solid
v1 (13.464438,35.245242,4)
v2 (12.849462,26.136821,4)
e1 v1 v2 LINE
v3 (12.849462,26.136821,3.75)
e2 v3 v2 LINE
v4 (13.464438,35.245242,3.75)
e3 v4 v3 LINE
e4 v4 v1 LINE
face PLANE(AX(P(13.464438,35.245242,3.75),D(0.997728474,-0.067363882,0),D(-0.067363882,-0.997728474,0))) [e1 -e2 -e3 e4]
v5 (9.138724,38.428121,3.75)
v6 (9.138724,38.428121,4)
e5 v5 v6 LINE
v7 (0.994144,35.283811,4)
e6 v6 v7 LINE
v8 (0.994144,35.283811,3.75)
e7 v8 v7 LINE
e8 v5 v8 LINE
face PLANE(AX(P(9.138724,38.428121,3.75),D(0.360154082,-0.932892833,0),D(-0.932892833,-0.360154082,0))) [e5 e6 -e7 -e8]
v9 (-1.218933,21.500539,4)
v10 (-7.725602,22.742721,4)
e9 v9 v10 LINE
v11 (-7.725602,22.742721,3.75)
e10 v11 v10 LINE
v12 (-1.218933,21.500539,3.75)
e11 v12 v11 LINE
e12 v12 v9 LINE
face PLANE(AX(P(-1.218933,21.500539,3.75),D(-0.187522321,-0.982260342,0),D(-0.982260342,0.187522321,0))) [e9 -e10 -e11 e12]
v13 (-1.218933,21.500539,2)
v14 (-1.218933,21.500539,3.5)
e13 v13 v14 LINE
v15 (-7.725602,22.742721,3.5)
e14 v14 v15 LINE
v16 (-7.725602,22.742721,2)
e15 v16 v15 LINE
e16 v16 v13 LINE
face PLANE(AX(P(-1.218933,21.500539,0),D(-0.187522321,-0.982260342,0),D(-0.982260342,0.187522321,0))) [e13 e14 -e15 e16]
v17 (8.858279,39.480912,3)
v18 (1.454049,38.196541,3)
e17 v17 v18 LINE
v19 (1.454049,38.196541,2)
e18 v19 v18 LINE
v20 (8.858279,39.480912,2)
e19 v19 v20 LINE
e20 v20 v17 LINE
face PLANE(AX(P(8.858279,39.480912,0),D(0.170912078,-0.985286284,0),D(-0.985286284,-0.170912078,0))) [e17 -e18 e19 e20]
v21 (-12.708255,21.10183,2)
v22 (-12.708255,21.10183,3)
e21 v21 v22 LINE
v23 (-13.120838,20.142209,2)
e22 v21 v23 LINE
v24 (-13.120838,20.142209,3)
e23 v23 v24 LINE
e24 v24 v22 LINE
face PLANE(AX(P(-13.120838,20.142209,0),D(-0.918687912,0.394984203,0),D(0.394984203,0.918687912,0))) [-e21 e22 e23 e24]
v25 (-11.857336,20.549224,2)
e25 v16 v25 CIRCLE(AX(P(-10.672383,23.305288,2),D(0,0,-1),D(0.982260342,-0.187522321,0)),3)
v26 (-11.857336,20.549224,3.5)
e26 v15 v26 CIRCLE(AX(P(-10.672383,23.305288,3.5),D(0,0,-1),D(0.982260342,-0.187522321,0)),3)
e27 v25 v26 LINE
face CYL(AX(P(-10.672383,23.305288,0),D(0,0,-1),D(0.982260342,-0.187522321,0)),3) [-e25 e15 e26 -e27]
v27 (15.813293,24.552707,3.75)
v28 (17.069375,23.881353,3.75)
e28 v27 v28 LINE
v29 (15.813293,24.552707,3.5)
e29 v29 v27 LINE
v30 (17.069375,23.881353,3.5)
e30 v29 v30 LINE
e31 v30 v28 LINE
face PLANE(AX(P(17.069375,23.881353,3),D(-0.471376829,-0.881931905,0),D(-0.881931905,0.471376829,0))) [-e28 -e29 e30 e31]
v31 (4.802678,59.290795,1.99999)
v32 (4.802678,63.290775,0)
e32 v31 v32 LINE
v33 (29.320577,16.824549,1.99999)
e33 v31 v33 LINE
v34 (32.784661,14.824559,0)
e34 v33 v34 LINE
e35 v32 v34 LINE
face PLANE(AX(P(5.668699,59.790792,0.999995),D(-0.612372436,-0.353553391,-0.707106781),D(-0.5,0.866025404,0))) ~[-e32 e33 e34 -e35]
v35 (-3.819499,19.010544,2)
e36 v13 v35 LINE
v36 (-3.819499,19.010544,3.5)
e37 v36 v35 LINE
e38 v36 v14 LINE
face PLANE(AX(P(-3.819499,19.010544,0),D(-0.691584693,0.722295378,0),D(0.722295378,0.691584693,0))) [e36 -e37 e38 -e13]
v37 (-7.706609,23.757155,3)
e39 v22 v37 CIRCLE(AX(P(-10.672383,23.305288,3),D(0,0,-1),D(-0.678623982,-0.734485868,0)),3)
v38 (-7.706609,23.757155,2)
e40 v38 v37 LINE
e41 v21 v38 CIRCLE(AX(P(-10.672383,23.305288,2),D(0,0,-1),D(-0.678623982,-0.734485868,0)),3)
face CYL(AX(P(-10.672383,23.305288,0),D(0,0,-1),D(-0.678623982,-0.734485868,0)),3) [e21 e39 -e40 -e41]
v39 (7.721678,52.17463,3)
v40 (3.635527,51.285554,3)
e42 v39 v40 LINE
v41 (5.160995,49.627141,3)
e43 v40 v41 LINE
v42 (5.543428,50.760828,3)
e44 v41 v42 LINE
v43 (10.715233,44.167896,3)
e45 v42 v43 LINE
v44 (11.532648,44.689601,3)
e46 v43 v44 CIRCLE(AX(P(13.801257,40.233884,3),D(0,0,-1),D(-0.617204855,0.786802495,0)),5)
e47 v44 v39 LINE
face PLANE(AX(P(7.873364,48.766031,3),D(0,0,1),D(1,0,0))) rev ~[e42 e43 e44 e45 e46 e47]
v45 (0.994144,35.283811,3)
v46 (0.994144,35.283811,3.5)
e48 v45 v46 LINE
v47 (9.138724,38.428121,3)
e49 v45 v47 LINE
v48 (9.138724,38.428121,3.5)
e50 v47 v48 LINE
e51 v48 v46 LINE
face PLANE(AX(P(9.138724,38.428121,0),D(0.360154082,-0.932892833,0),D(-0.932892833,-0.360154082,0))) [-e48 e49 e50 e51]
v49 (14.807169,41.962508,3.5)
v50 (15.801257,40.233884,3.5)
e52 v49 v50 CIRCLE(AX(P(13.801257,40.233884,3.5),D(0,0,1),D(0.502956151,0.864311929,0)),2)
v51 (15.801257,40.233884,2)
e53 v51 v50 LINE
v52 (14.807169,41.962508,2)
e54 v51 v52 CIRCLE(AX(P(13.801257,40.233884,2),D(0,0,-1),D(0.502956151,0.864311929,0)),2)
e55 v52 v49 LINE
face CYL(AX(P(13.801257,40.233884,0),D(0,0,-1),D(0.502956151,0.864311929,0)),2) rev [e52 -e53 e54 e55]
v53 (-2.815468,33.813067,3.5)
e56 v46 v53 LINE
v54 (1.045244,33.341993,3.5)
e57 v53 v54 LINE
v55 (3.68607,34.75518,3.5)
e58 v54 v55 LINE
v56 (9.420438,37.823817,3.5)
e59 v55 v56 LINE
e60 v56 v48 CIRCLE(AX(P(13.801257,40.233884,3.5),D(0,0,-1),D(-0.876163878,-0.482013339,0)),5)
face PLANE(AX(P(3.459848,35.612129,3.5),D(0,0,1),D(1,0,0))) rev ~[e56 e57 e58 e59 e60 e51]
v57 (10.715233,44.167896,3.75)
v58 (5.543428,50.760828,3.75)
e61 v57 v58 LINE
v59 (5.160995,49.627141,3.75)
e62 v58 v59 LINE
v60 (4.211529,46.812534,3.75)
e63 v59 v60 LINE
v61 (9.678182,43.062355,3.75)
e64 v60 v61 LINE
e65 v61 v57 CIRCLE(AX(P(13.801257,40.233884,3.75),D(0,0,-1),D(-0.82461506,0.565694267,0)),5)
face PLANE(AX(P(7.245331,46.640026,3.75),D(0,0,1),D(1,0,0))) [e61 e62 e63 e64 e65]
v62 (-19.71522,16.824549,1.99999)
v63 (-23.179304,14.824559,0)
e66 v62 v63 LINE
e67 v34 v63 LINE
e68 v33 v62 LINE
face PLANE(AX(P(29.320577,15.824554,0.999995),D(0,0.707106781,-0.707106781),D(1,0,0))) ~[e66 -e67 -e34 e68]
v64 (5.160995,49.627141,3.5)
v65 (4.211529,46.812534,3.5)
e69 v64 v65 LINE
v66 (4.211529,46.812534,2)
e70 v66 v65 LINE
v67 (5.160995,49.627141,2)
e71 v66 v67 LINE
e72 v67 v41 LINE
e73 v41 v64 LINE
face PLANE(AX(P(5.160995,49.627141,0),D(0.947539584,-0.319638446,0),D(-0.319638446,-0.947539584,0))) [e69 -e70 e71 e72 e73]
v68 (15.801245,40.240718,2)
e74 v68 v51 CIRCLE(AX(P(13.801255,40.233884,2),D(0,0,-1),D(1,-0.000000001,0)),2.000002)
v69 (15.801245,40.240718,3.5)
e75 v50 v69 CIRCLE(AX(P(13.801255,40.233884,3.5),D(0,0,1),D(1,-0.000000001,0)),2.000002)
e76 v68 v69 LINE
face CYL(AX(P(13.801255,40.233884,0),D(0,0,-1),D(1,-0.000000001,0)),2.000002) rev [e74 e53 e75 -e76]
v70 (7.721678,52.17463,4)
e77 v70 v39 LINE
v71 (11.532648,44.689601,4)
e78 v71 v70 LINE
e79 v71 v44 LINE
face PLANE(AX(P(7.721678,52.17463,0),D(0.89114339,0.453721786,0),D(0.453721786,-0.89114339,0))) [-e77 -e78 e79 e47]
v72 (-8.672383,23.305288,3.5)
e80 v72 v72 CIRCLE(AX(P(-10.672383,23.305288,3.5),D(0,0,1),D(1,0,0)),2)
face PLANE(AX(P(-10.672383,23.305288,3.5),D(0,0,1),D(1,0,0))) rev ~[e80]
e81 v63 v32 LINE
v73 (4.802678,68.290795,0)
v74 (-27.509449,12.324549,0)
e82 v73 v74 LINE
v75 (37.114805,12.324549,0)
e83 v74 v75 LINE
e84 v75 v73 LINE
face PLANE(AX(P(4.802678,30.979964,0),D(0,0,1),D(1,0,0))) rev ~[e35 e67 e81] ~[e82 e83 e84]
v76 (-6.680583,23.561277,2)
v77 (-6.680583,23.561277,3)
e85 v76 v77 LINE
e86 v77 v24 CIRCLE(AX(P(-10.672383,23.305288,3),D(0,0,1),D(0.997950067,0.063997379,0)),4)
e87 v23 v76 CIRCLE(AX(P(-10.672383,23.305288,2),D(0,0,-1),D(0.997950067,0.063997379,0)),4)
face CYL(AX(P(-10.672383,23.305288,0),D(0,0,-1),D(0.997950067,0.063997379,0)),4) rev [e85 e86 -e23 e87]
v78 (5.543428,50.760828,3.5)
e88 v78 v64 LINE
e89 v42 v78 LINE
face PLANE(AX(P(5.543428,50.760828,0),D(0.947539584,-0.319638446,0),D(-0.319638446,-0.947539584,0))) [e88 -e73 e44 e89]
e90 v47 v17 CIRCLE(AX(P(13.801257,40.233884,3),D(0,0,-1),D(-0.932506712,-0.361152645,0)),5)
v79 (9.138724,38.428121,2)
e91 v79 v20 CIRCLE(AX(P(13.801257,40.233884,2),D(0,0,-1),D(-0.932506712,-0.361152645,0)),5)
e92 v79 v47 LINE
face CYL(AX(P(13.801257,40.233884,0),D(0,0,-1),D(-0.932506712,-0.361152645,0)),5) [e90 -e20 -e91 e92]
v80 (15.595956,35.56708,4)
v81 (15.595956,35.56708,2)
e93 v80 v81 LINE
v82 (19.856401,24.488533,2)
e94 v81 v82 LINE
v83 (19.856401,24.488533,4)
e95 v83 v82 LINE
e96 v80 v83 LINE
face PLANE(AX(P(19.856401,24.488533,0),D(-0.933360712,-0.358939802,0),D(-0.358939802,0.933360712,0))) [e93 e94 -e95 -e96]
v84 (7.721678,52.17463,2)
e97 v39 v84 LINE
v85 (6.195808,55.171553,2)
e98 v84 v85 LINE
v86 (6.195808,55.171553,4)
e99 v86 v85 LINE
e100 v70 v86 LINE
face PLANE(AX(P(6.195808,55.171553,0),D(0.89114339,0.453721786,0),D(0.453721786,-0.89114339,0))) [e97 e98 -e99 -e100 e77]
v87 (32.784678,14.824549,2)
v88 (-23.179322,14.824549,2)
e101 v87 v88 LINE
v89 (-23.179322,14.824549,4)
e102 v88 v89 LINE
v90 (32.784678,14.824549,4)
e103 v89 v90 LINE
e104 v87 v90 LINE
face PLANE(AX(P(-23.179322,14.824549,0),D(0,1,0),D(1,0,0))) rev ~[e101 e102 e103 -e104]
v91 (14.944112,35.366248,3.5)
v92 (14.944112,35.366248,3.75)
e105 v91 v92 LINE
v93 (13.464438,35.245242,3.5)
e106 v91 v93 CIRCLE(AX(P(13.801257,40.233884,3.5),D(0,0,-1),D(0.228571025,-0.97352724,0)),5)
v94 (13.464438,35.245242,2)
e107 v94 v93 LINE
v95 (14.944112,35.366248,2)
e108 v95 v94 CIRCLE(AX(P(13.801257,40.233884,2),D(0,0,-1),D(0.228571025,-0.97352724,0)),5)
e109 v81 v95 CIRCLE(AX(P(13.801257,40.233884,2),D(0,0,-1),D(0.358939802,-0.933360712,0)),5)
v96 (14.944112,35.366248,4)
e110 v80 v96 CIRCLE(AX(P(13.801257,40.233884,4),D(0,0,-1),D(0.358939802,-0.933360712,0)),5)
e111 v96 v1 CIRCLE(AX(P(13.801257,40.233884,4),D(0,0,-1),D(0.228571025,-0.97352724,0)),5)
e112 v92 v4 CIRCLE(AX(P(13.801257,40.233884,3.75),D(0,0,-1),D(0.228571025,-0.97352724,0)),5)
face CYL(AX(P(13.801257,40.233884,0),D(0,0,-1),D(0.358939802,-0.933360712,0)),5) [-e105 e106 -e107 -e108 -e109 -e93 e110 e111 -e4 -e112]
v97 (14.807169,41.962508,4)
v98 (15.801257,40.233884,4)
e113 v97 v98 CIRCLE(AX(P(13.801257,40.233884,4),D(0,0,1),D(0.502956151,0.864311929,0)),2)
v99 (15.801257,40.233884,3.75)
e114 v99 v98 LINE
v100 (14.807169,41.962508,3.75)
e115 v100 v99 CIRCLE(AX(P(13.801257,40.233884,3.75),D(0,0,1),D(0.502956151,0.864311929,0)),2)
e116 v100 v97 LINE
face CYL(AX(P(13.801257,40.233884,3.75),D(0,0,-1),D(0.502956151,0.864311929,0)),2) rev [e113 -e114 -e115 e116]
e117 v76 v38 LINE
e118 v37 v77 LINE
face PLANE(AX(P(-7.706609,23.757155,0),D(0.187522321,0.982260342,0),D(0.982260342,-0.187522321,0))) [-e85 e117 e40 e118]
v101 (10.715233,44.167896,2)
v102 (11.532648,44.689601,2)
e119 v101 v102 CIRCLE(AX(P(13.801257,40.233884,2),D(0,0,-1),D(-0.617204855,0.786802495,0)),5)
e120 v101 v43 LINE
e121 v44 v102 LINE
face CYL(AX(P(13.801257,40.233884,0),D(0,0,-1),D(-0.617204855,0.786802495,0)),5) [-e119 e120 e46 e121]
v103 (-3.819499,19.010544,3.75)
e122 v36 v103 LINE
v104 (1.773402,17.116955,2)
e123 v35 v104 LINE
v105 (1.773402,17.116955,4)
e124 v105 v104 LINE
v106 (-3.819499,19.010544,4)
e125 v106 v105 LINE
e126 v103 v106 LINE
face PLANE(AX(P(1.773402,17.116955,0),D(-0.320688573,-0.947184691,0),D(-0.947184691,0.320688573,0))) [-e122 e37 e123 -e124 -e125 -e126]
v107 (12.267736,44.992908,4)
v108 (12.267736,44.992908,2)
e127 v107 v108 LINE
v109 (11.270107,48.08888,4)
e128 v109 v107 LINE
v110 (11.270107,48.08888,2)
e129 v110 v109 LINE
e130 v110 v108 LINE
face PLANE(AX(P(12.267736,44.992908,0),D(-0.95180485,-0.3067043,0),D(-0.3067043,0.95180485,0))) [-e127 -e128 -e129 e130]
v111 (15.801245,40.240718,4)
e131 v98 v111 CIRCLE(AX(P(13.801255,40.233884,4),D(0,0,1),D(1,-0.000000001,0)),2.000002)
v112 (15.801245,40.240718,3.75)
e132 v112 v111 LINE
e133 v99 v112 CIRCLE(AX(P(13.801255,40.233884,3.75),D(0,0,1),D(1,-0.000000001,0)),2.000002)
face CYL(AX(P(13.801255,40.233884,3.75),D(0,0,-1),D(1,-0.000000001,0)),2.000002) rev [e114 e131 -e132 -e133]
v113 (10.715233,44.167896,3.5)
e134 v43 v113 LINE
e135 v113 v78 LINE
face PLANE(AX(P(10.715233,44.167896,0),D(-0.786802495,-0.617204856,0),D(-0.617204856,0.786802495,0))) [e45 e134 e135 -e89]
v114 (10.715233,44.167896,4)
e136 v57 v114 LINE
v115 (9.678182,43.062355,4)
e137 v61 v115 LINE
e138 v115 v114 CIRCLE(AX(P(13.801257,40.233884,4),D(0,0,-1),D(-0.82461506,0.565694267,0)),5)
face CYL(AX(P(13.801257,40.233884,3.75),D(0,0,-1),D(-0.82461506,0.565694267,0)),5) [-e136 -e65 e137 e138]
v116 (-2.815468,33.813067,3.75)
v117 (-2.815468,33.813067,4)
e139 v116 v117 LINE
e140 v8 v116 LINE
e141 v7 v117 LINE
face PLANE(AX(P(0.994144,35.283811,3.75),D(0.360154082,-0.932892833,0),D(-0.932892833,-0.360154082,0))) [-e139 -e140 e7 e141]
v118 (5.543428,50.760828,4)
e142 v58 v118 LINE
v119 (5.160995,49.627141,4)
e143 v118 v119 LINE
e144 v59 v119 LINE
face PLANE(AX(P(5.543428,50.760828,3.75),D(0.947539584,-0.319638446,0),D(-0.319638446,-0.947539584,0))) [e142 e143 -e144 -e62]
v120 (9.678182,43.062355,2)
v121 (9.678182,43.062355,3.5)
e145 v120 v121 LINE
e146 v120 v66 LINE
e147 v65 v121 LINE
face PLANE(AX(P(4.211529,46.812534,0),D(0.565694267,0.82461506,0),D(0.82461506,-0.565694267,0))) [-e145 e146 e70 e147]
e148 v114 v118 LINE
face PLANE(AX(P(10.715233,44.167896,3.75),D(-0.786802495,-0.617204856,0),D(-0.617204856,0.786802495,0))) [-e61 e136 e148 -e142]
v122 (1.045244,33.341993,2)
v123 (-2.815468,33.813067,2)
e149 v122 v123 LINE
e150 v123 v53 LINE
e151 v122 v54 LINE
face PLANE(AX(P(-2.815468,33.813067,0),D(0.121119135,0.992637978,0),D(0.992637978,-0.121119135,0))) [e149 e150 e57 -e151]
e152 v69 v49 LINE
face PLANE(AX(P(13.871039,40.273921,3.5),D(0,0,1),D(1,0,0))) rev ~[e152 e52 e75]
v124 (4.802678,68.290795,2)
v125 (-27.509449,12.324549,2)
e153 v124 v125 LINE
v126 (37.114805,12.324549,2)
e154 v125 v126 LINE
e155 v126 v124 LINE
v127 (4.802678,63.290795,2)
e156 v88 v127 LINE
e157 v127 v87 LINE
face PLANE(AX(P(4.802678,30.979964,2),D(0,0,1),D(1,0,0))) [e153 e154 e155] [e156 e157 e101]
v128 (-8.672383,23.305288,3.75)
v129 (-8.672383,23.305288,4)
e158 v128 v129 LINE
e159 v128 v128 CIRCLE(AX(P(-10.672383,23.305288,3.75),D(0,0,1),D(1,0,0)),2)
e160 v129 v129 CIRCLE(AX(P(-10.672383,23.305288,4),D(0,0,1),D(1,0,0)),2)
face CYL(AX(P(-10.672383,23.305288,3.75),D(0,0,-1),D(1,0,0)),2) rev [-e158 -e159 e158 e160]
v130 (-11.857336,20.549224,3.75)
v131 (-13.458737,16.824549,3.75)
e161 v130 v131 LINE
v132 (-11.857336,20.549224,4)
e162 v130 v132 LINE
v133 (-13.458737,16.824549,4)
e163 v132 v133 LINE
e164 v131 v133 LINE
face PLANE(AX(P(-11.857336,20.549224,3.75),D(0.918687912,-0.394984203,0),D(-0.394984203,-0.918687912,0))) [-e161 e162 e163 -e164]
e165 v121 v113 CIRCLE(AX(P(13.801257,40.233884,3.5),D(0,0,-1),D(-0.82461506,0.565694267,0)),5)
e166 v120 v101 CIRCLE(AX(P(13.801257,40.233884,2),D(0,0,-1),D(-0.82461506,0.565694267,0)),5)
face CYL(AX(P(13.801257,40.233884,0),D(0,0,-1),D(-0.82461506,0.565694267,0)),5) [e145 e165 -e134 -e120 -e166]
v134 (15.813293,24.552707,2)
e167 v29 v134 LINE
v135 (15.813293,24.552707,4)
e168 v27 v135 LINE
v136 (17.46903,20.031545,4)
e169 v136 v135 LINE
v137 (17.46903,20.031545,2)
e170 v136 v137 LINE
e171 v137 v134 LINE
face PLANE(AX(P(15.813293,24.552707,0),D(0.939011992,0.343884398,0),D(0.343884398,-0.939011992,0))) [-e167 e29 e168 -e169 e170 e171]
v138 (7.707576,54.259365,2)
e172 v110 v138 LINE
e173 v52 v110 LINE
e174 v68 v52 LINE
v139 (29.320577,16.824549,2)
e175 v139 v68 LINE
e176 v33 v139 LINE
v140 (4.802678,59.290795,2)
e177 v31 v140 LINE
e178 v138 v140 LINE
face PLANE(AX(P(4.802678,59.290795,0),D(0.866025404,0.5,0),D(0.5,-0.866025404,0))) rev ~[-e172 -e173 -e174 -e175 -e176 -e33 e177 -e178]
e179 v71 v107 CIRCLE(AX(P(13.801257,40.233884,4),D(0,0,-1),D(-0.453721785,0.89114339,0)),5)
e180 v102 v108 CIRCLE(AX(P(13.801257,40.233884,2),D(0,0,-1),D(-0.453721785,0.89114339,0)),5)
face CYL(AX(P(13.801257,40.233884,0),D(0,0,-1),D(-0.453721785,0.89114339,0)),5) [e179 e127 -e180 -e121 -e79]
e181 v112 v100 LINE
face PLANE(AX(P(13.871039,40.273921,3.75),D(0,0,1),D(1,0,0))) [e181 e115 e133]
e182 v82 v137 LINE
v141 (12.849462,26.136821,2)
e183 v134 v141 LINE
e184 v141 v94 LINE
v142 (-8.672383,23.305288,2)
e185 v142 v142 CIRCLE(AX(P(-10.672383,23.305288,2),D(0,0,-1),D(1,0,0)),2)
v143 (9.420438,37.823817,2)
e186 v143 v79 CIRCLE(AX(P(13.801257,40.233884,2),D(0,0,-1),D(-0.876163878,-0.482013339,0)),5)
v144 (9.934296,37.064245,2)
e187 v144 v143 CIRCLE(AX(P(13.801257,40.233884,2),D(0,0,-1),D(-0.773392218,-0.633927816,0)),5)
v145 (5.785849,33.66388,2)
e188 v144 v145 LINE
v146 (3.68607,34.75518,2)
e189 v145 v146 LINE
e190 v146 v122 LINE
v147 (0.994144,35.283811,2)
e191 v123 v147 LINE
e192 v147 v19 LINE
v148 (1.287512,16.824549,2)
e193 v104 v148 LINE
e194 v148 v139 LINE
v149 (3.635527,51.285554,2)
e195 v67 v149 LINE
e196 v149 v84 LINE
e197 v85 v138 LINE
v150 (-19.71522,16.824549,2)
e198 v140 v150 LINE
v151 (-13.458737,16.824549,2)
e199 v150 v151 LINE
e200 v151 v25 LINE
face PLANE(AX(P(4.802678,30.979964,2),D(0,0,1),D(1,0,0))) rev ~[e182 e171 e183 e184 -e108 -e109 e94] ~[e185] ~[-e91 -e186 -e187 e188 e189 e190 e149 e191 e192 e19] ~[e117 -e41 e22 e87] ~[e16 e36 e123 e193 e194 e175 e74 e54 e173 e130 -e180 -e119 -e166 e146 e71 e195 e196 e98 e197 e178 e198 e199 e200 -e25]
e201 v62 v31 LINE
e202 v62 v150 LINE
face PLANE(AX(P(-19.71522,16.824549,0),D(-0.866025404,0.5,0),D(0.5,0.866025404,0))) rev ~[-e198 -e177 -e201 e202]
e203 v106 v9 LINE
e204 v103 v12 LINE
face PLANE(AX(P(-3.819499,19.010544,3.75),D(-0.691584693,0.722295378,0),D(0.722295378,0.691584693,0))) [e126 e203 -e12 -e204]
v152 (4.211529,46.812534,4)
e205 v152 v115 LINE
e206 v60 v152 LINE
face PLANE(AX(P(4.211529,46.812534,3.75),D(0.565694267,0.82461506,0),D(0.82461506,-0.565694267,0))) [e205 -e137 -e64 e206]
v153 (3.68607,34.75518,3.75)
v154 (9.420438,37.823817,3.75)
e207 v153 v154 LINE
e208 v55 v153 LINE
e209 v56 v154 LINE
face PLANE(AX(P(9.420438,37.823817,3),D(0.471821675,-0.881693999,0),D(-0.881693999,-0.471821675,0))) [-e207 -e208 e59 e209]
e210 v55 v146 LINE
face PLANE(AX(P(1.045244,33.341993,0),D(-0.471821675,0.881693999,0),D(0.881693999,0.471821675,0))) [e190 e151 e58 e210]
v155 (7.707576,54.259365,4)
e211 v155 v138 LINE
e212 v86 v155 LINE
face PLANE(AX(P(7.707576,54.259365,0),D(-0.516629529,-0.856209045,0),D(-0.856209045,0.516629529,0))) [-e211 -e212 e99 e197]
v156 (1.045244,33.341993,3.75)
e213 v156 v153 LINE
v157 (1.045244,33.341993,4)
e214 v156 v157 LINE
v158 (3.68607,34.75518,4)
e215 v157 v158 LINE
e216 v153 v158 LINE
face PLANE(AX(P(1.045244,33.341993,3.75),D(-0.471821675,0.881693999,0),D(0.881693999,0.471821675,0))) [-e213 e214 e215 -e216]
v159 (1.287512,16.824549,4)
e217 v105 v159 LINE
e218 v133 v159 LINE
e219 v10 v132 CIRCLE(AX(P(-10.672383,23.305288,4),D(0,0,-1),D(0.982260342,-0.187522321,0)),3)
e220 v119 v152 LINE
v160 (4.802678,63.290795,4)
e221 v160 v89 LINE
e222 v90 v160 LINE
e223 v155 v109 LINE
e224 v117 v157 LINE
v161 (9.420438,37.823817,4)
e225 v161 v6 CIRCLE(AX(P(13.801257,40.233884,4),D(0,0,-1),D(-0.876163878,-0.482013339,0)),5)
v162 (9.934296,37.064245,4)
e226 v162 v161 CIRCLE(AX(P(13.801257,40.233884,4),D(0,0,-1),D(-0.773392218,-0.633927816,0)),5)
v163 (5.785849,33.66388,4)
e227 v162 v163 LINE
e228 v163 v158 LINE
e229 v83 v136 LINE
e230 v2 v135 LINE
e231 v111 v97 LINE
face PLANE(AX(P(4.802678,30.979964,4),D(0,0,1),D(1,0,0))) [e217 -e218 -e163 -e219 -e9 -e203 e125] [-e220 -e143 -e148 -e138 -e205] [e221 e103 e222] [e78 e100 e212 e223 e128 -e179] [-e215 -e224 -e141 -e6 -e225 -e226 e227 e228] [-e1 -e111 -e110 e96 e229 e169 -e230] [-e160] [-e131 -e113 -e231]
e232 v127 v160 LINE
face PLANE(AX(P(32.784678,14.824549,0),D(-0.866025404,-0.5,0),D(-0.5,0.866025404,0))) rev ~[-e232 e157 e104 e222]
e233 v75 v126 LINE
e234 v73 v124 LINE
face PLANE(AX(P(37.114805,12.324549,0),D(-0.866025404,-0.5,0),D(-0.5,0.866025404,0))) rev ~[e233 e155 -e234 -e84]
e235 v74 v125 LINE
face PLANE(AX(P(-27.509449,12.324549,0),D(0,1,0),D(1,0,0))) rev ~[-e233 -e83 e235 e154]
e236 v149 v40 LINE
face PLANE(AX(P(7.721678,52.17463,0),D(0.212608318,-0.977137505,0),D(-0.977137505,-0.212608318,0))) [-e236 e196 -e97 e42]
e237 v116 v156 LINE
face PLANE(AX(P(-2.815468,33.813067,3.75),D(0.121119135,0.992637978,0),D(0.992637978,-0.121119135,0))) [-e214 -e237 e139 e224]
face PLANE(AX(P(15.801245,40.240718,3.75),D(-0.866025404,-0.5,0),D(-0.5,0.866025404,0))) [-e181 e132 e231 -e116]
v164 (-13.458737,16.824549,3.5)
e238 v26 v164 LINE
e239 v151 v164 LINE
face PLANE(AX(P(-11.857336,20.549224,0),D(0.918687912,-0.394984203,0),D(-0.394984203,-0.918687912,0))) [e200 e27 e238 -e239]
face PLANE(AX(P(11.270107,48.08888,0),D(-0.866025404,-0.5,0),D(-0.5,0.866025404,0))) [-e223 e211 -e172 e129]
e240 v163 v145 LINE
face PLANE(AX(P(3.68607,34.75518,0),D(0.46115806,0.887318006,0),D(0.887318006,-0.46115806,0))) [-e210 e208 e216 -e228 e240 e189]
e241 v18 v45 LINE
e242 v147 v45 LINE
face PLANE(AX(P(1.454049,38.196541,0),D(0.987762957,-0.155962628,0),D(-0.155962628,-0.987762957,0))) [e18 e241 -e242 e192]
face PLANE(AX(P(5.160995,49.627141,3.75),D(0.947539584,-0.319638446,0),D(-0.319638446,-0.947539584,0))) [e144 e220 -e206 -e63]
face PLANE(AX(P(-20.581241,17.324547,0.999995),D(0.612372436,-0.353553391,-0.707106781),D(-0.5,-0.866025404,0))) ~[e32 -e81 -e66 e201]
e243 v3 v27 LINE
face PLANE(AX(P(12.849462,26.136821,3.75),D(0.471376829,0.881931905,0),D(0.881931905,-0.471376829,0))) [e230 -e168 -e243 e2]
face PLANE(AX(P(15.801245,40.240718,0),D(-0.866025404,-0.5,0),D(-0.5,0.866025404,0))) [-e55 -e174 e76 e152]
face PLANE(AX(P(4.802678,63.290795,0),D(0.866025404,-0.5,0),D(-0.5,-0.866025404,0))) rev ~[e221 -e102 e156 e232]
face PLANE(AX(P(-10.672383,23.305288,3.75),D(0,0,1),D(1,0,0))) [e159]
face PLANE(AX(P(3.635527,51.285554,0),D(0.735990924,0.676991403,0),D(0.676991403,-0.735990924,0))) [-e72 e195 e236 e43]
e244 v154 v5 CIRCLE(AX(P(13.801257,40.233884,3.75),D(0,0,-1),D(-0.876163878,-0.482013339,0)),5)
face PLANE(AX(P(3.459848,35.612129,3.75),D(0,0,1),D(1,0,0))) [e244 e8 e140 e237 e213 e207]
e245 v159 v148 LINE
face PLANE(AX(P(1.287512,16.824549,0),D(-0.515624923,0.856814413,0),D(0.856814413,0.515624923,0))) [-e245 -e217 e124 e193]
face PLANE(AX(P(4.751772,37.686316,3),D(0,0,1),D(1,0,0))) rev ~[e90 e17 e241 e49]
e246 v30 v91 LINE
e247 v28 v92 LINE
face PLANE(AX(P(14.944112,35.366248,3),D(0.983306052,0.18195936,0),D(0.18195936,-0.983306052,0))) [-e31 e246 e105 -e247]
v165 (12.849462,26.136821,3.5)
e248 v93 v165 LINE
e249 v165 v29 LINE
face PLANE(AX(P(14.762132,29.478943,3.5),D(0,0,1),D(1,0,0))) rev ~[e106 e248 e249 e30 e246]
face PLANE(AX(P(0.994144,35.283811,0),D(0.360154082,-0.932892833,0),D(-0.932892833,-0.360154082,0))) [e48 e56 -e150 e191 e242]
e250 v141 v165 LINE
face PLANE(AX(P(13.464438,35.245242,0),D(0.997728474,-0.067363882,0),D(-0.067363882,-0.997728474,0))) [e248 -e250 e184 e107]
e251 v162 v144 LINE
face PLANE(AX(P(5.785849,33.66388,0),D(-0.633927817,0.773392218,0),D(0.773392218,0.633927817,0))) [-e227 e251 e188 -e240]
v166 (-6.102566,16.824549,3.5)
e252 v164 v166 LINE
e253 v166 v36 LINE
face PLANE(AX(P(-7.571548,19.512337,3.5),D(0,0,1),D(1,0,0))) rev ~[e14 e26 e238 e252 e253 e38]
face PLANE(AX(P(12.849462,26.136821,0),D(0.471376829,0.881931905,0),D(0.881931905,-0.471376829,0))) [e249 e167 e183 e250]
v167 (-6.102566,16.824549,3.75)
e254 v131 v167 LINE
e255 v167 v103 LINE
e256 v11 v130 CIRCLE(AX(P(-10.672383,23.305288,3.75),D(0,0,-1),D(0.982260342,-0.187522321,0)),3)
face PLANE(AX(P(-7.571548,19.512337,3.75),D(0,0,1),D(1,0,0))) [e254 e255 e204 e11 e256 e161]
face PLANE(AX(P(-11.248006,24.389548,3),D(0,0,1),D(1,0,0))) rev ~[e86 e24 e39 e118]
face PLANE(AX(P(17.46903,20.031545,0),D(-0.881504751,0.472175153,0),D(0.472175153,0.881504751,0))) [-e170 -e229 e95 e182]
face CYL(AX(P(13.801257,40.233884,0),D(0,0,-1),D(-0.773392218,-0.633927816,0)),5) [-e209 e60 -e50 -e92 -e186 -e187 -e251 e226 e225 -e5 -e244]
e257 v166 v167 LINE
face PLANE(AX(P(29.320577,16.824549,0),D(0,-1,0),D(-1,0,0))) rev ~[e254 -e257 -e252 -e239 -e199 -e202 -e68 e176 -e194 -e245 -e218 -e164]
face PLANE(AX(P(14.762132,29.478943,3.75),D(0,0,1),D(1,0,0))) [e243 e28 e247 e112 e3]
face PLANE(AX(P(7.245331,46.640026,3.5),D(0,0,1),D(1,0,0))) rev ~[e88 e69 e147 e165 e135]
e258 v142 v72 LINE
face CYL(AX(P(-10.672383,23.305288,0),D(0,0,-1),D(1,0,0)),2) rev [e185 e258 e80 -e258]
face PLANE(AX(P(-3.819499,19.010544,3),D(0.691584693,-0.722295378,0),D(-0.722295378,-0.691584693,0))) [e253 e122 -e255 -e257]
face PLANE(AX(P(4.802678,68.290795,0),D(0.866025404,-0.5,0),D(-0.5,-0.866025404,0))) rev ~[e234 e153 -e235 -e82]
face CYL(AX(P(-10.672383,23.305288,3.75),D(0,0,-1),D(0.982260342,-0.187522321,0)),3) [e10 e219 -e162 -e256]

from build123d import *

# Parameters (mm, degrees)
F1_DEPTH  = 4
F2_DEPTH  = 2
F3_START  = 2
F3_DEPTH  = 2
F4_SIZE   = 1.99999
F6_START  = 3.75
F5_R      = 2
F6_DEPTH  = 0.25
F7_DEPTH  = 3.5
F8_DEPTH  = 3.5
F9_DEPTH  = 3
F10_DEPTH = 3.25
F11_DEPTH = 3


# Not quite as in the source:
# - a fillet or chamfer is up to 0.001 mm smaller than in the source, because OpenCascade refuses the exact size


with BuildPart() as f1:
    # F0 (on Top) → F1 (new body)
    with BuildSketch(Plane.XY):
        Polygon((32.7846783229, 14.824549064), (4.8026783229, 63.2907947614), (-23.1793216771, 14.824549064), align=None)
        Polygon((-19.715220062, 16.824549064), (4.8026783229, 59.2907947614), (29.3205767077, 16.824549064), align=None, mode=Mode.SUBTRACT)
    extrude(amount=F1_DEPTH)

    # F0 (on Top) → F2 (join)
    with BuildSketch(Plane.XY):
        Polygon((37.1148053418, 12.324549064), (4.8026783229, 68.2907947614), (-27.509448696, 12.324549064), align=None)
        Polygon((-23.1793216771, 14.824549064), (4.8026783229, 63.2907947614), (32.7846783229, 14.824549064), align=None, mode=Mode.SUBTRACT)
    extrude(amount=F2_DEPTH)

    # F0 (on Top) → F3 (join)
    with BuildSketch(Plane.XY.offset(F3_START)):
        Polygon((29.3205767077, 16.824549064), (4.8026783229, 59.2907947614), (-19.715220062, 16.824549064), align=None)
    extrude(amount=F3_DEPTH)

    # F4 (size 2 in the source; OpenCascade refuses exactly that, so slightly less here)
    f4_edges = [f1.edges().sort_by_distance(p)[0] for p in [
        (4.802678, 16.824549, 0),
        (-7.456271, 38.057672, 0),
        (17.061628, 38.057672, 0),
    ]]
    chamfer(f4_edges, length=F4_SIZE)

    # F5 (on face) → F6 (cut)
    with BuildSketch(Plane.XY.offset(F6_START)):
        with BuildLine():
            Line((15.8012454512, 40.2407176847), (14.8071694273, 41.9625078646))
            ThreePointArc((14.8071694273, 41.9625078646), (12.0675004242, 39.2368445398), (15.801257126, 40.2338840067))
            ThreePointArc((15.801257126, 40.2338840067), (15.8012542073, 40.2373008507), (15.8012454512, 40.2407176847))
        make_face()
        with BuildLine():
            Line((17.0693753854, 23.8813530259), (14.9441122519, 35.3662478082))
            ThreePointArc((14.9441122519, 35.3662478082), (14.2087911946, 35.2505200844), (13.4644377158, 35.2452416378))
            Line((13.4644377158, 35.2452416378), (12.8494622186, 26.1368211359))
            Line((12.8494622186, 26.1368211359), (15.8132929355, 24.552706629))
            Line((15.8132929355, 24.552706629), (17.0693753854, 23.8813530259))
        make_face()
        with BuildLine():
            ThreePointArc((9.6781818277, 43.0623553402), (10.154568974, 43.6546537332), (10.7152328484, 44.1678964823))
            Line((10.7152328484, 44.1678964823), (5.5434275419, 50.7608279586))
            Line((5.5434275419, 50.7608279586), (5.1609951292, 49.6271412781))
            Line((5.1609951292, 49.6271412781), (4.2115291581, 46.8125343323))
            Line((4.2115291581, 46.8125343323), (9.6781818277, 43.0623553402))
        make_face()
        with BuildLine():
            Line((-13.4587365793, 16.824549064), (-6.1025659626, 16.824549064))
            Line((-6.1025659626, 16.824549064), (-3.819498702, 19.0105444595))
            Line((-3.819498702, 19.0105444595), (-1.2189327972, 21.5005390346))
            Line((-1.2189327972, 21.5005390346), (-7.725601985, 22.742720621))
            ThreePointArc((-7.725601985, 22.742720621), (-9.2656609828, 20.6555454959), (-11.8573356204, 20.5492238495))
            Line((-11.8573356204, 20.5492238495), (-13.4587365793, 16.824549064))
        make_face()
        with BuildLine():
            Line((3.6860700174, 34.755180139), (9.4204377363, 37.8238173116))
            ThreePointArc((9.4204377363, 37.8238173116), (9.2694965624, 38.1212680469), (9.1387235678, 38.4281207834))
            Line((9.1387235678, 38.4281207834), (0.9941436583, 35.2838113904))
            Line((0.9941436583, 35.2838113904), (-2.8154677711, 33.8130667806))
            Line((-2.8154677711, 33.8130667806), (1.0452440474, 33.3419926465))
            Line((1.0452440474, 33.3419926465), (3.6860700174, 34.755180139))
        make_face()
        with Locations((-10.6723830104, 23.3052875847)):
            Circle(F5_R)
    extrude(amount=F6_DEPTH, mode=Mode.SUBTRACT)

    # F5 (on face) → F7 (cut)
    with BuildSketch(Plane.XY):
        with BuildLine():
            Line((15.8012454512, 40.2407176847), (14.8071694273, 41.9625078646))
            ThreePointArc((14.8071694273, 41.9625078646), (12.0675004242, 39.2368445398), (15.801257126, 40.2338840067))
            ThreePointArc((15.801257126, 40.2338840067), (15.8012542073, 40.2373008507), (15.8012454512, 40.2407176847))
        make_face()
        with Locations((-10.6723830104, 23.3052875847)):
            Circle(F5_R)
    extrude(amount=F7_DEPTH, mode=Mode.SUBTRACT)

    # F5 (on face) → F8 (cut)
    with BuildSketch(Plane.XY):
        with BuildLine():
            Line((3.6860700174, 34.755180139), (9.4204377363, 37.8238173116))
            ThreePointArc((9.4204377363, 37.8238173116), (9.2694965624, 38.1212680469), (9.1387235678, 38.4281207834))
            Line((9.1387235678, 38.4281207834), (0.9941436583, 35.2838113904))
            Line((0.9941436583, 35.2838113904), (-2.8154677711, 33.8130667806))
            Line((-2.8154677711, 33.8130667806), (1.0452440474, 33.3419926465))
            Line((1.0452440474, 33.3419926465), (3.6860700174, 34.755180139))
        make_face()
        with BuildLine():
            Line((17.0693753854, 23.8813530259), (14.9441122519, 35.3662478082))
            ThreePointArc((14.9441122519, 35.3662478082), (14.2087911946, 35.2505200844), (13.4644377158, 35.2452416378))
            Line((13.4644377158, 35.2452416378), (12.8494622186, 26.1368211359))
            Line((12.8494622186, 26.1368211359), (15.8132929355, 24.552706629))
            Line((15.8132929355, 24.552706629), (17.0693753854, 23.8813530259))
        make_face()
        with BuildLine():
            Line((-13.4587365793, 16.824549064), (-6.1025659626, 16.824549064))
            Line((-6.1025659626, 16.824549064), (-3.819498702, 19.0105444595))
            Line((-3.819498702, 19.0105444595), (-1.2189327972, 21.5005390346))
            Line((-1.2189327972, 21.5005390346), (-7.725601985, 22.742720621))
            ThreePointArc((-7.725601985, 22.742720621), (-9.2656609828, 20.6555454959), (-11.8573356204, 20.5492238495))
            Line((-11.8573356204, 20.5492238495), (-13.4587365793, 16.824549064))
        make_face()
        with BuildLine():
            ThreePointArc((9.6781818277, 43.0623553402), (10.154568974, 43.6546537332), (10.7152328484, 44.1678964823))
            Line((10.7152328484, 44.1678964823), (5.5434275419, 50.7608279586))
            Line((5.5434275419, 50.7608279586), (5.1609951292, 49.6271412781))
            Line((5.1609951292, 49.6271412781), (4.2115291581, 46.8125343323))
            Line((4.2115291581, 46.8125343323), (9.6781818277, 43.0623553402))
        make_face()
    extrude(amount=F8_DEPTH, mode=Mode.SUBTRACT)

    # F5 (on face) → F9 (cut)
    with BuildSketch(Plane.XY):
        with BuildLine():
            Line((19.8564007878, 24.4885329157), (15.5959561349, 35.5670804467))
            ThreePointArc((15.5959561349, 35.5670804467), (15.2734627879, 35.4555359146), (14.9441122519, 35.3662478082))
            Line((14.9441122519, 35.3662478082), (17.0693753854, 23.8813530259))
            Line((17.0693753854, 23.8813530259), (15.8132929355, 24.552706629))
            Line((15.8132929355, 24.552706629), (17.4690298736, 20.0315453112))
            Line((17.4690298736, 20.0315453112), (19.8564007878, 24.4885329157))
        make_face()
        Polygon((-6.1025659626, 16.824549064), (1.2875116271, 16.824549064), (1.7734020948, 17.1169545501), (-3.819498702, 19.0105444595), align=None)
        with BuildLine():
            Line((5.785849411, 33.66388008), (9.9342960343, 37.064244924))
            ThreePointArc((9.9342960343, 37.064244924), (9.6599157648, 37.4322252607), (9.4204377363, 37.8238173116))
            Line((9.4204377363, 37.8238173116), (3.6860700174, 34.755180139))
            Line((3.6860700174, 34.755180139), (5.785849411, 33.66388008))
        make_face()
        with BuildLine():
            ThreePointArc((11.5326481984, 44.6896009562), (11.8941525727, 44.8558913869), (12.2677356256, 44.9929082563))
            Line((12.2677356256, 44.9929082563), (11.2701070238, 48.0888796571))
            Line((11.2701070238, 48.0888796571), (7.7075759005, 54.2593645662))
            Line((7.7075759005, 54.2593645662), (6.1958078295, 55.1715530455))
            Line((6.1958078295, 55.1715530455), (7.7216781624, 52.1746300315))
            Line((7.7216781624, 52.1746300315), (11.5326481984, 44.6896009562))
        make_face()
        with BuildLine():
            ThreePointArc((-12.7082549566, 21.1018299793), (-12.079105038, 25.9550296735), (-7.7066088949, 23.7571547066))
            Line((-7.7066088949, 23.7571547066), (-6.6805827438, 23.5612770993))
            ThreePointArc((-6.6805827438, 23.5612770993), (-12.5480123805, 26.8382770364), (-13.1208381636, 20.1422088056))
            Line((-13.1208381636, 20.1422088056), (-12.7082549566, 21.1018299793))
        make_face()
    extrude(amount=F9_DEPTH, mode=Mode.SUBTRACT)

    # F10 (cut): faces of the model
    f10_faces = [f1.faces().sort_by_distance(p)[0] for p in [
        (9.5592668565, 49.7626778986, 3),
        (6.8730240158, 35.6258562625, 3),
        (-2.519612135, 17.5665266523, 3),
        (17.3422888297, 27.0693911728, 3),
    ]]
    extrude(f10_faces, amount=-F10_DEPTH, mode=Mode.SUBTRACT)

    # F5 (on face) → F11 (cut)
    with BuildSketch(Plane.XY):
        with BuildLine():
            ThreePointArc((9.1387235678, 38.4281207834), (8.9697402045, 38.9468547775), (8.8582790135, 39.4809116441))
            Line((8.8582790135, 39.4809116441), (1.4540485572, 38.196541369))
            Line((1.4540485572, 38.196541369), (0.9941436583, 35.2838113904))
            Line((0.9941436583, 35.2838113904), (9.1387235678, 38.4281207834))
        make_face()
        with BuildLine():
            ThreePointArc((10.7152328484, 44.1678964823), (11.1112630591, 44.4486119837), (11.5326481984, 44.6896009562))
            Line((11.5326481984, 44.6896009562), (7.7216781624, 52.1746300315))
            Line((7.7216781624, 52.1746300315), (3.6355266348, 51.2855537236))
            Line((3.6355266348, 51.2855537236), (5.1609951292, 49.6271412781))
            Line((5.1609951292, 49.6271412781), (5.5434275419, 50.7608279586))
            Line((5.5434275419, 50.7608279586), (10.7152328484, 44.1678964823))
        make_face()
    extrude(amount=F11_DEPTH, mode=Mode.SUBTRACT)


solid = f1.part
